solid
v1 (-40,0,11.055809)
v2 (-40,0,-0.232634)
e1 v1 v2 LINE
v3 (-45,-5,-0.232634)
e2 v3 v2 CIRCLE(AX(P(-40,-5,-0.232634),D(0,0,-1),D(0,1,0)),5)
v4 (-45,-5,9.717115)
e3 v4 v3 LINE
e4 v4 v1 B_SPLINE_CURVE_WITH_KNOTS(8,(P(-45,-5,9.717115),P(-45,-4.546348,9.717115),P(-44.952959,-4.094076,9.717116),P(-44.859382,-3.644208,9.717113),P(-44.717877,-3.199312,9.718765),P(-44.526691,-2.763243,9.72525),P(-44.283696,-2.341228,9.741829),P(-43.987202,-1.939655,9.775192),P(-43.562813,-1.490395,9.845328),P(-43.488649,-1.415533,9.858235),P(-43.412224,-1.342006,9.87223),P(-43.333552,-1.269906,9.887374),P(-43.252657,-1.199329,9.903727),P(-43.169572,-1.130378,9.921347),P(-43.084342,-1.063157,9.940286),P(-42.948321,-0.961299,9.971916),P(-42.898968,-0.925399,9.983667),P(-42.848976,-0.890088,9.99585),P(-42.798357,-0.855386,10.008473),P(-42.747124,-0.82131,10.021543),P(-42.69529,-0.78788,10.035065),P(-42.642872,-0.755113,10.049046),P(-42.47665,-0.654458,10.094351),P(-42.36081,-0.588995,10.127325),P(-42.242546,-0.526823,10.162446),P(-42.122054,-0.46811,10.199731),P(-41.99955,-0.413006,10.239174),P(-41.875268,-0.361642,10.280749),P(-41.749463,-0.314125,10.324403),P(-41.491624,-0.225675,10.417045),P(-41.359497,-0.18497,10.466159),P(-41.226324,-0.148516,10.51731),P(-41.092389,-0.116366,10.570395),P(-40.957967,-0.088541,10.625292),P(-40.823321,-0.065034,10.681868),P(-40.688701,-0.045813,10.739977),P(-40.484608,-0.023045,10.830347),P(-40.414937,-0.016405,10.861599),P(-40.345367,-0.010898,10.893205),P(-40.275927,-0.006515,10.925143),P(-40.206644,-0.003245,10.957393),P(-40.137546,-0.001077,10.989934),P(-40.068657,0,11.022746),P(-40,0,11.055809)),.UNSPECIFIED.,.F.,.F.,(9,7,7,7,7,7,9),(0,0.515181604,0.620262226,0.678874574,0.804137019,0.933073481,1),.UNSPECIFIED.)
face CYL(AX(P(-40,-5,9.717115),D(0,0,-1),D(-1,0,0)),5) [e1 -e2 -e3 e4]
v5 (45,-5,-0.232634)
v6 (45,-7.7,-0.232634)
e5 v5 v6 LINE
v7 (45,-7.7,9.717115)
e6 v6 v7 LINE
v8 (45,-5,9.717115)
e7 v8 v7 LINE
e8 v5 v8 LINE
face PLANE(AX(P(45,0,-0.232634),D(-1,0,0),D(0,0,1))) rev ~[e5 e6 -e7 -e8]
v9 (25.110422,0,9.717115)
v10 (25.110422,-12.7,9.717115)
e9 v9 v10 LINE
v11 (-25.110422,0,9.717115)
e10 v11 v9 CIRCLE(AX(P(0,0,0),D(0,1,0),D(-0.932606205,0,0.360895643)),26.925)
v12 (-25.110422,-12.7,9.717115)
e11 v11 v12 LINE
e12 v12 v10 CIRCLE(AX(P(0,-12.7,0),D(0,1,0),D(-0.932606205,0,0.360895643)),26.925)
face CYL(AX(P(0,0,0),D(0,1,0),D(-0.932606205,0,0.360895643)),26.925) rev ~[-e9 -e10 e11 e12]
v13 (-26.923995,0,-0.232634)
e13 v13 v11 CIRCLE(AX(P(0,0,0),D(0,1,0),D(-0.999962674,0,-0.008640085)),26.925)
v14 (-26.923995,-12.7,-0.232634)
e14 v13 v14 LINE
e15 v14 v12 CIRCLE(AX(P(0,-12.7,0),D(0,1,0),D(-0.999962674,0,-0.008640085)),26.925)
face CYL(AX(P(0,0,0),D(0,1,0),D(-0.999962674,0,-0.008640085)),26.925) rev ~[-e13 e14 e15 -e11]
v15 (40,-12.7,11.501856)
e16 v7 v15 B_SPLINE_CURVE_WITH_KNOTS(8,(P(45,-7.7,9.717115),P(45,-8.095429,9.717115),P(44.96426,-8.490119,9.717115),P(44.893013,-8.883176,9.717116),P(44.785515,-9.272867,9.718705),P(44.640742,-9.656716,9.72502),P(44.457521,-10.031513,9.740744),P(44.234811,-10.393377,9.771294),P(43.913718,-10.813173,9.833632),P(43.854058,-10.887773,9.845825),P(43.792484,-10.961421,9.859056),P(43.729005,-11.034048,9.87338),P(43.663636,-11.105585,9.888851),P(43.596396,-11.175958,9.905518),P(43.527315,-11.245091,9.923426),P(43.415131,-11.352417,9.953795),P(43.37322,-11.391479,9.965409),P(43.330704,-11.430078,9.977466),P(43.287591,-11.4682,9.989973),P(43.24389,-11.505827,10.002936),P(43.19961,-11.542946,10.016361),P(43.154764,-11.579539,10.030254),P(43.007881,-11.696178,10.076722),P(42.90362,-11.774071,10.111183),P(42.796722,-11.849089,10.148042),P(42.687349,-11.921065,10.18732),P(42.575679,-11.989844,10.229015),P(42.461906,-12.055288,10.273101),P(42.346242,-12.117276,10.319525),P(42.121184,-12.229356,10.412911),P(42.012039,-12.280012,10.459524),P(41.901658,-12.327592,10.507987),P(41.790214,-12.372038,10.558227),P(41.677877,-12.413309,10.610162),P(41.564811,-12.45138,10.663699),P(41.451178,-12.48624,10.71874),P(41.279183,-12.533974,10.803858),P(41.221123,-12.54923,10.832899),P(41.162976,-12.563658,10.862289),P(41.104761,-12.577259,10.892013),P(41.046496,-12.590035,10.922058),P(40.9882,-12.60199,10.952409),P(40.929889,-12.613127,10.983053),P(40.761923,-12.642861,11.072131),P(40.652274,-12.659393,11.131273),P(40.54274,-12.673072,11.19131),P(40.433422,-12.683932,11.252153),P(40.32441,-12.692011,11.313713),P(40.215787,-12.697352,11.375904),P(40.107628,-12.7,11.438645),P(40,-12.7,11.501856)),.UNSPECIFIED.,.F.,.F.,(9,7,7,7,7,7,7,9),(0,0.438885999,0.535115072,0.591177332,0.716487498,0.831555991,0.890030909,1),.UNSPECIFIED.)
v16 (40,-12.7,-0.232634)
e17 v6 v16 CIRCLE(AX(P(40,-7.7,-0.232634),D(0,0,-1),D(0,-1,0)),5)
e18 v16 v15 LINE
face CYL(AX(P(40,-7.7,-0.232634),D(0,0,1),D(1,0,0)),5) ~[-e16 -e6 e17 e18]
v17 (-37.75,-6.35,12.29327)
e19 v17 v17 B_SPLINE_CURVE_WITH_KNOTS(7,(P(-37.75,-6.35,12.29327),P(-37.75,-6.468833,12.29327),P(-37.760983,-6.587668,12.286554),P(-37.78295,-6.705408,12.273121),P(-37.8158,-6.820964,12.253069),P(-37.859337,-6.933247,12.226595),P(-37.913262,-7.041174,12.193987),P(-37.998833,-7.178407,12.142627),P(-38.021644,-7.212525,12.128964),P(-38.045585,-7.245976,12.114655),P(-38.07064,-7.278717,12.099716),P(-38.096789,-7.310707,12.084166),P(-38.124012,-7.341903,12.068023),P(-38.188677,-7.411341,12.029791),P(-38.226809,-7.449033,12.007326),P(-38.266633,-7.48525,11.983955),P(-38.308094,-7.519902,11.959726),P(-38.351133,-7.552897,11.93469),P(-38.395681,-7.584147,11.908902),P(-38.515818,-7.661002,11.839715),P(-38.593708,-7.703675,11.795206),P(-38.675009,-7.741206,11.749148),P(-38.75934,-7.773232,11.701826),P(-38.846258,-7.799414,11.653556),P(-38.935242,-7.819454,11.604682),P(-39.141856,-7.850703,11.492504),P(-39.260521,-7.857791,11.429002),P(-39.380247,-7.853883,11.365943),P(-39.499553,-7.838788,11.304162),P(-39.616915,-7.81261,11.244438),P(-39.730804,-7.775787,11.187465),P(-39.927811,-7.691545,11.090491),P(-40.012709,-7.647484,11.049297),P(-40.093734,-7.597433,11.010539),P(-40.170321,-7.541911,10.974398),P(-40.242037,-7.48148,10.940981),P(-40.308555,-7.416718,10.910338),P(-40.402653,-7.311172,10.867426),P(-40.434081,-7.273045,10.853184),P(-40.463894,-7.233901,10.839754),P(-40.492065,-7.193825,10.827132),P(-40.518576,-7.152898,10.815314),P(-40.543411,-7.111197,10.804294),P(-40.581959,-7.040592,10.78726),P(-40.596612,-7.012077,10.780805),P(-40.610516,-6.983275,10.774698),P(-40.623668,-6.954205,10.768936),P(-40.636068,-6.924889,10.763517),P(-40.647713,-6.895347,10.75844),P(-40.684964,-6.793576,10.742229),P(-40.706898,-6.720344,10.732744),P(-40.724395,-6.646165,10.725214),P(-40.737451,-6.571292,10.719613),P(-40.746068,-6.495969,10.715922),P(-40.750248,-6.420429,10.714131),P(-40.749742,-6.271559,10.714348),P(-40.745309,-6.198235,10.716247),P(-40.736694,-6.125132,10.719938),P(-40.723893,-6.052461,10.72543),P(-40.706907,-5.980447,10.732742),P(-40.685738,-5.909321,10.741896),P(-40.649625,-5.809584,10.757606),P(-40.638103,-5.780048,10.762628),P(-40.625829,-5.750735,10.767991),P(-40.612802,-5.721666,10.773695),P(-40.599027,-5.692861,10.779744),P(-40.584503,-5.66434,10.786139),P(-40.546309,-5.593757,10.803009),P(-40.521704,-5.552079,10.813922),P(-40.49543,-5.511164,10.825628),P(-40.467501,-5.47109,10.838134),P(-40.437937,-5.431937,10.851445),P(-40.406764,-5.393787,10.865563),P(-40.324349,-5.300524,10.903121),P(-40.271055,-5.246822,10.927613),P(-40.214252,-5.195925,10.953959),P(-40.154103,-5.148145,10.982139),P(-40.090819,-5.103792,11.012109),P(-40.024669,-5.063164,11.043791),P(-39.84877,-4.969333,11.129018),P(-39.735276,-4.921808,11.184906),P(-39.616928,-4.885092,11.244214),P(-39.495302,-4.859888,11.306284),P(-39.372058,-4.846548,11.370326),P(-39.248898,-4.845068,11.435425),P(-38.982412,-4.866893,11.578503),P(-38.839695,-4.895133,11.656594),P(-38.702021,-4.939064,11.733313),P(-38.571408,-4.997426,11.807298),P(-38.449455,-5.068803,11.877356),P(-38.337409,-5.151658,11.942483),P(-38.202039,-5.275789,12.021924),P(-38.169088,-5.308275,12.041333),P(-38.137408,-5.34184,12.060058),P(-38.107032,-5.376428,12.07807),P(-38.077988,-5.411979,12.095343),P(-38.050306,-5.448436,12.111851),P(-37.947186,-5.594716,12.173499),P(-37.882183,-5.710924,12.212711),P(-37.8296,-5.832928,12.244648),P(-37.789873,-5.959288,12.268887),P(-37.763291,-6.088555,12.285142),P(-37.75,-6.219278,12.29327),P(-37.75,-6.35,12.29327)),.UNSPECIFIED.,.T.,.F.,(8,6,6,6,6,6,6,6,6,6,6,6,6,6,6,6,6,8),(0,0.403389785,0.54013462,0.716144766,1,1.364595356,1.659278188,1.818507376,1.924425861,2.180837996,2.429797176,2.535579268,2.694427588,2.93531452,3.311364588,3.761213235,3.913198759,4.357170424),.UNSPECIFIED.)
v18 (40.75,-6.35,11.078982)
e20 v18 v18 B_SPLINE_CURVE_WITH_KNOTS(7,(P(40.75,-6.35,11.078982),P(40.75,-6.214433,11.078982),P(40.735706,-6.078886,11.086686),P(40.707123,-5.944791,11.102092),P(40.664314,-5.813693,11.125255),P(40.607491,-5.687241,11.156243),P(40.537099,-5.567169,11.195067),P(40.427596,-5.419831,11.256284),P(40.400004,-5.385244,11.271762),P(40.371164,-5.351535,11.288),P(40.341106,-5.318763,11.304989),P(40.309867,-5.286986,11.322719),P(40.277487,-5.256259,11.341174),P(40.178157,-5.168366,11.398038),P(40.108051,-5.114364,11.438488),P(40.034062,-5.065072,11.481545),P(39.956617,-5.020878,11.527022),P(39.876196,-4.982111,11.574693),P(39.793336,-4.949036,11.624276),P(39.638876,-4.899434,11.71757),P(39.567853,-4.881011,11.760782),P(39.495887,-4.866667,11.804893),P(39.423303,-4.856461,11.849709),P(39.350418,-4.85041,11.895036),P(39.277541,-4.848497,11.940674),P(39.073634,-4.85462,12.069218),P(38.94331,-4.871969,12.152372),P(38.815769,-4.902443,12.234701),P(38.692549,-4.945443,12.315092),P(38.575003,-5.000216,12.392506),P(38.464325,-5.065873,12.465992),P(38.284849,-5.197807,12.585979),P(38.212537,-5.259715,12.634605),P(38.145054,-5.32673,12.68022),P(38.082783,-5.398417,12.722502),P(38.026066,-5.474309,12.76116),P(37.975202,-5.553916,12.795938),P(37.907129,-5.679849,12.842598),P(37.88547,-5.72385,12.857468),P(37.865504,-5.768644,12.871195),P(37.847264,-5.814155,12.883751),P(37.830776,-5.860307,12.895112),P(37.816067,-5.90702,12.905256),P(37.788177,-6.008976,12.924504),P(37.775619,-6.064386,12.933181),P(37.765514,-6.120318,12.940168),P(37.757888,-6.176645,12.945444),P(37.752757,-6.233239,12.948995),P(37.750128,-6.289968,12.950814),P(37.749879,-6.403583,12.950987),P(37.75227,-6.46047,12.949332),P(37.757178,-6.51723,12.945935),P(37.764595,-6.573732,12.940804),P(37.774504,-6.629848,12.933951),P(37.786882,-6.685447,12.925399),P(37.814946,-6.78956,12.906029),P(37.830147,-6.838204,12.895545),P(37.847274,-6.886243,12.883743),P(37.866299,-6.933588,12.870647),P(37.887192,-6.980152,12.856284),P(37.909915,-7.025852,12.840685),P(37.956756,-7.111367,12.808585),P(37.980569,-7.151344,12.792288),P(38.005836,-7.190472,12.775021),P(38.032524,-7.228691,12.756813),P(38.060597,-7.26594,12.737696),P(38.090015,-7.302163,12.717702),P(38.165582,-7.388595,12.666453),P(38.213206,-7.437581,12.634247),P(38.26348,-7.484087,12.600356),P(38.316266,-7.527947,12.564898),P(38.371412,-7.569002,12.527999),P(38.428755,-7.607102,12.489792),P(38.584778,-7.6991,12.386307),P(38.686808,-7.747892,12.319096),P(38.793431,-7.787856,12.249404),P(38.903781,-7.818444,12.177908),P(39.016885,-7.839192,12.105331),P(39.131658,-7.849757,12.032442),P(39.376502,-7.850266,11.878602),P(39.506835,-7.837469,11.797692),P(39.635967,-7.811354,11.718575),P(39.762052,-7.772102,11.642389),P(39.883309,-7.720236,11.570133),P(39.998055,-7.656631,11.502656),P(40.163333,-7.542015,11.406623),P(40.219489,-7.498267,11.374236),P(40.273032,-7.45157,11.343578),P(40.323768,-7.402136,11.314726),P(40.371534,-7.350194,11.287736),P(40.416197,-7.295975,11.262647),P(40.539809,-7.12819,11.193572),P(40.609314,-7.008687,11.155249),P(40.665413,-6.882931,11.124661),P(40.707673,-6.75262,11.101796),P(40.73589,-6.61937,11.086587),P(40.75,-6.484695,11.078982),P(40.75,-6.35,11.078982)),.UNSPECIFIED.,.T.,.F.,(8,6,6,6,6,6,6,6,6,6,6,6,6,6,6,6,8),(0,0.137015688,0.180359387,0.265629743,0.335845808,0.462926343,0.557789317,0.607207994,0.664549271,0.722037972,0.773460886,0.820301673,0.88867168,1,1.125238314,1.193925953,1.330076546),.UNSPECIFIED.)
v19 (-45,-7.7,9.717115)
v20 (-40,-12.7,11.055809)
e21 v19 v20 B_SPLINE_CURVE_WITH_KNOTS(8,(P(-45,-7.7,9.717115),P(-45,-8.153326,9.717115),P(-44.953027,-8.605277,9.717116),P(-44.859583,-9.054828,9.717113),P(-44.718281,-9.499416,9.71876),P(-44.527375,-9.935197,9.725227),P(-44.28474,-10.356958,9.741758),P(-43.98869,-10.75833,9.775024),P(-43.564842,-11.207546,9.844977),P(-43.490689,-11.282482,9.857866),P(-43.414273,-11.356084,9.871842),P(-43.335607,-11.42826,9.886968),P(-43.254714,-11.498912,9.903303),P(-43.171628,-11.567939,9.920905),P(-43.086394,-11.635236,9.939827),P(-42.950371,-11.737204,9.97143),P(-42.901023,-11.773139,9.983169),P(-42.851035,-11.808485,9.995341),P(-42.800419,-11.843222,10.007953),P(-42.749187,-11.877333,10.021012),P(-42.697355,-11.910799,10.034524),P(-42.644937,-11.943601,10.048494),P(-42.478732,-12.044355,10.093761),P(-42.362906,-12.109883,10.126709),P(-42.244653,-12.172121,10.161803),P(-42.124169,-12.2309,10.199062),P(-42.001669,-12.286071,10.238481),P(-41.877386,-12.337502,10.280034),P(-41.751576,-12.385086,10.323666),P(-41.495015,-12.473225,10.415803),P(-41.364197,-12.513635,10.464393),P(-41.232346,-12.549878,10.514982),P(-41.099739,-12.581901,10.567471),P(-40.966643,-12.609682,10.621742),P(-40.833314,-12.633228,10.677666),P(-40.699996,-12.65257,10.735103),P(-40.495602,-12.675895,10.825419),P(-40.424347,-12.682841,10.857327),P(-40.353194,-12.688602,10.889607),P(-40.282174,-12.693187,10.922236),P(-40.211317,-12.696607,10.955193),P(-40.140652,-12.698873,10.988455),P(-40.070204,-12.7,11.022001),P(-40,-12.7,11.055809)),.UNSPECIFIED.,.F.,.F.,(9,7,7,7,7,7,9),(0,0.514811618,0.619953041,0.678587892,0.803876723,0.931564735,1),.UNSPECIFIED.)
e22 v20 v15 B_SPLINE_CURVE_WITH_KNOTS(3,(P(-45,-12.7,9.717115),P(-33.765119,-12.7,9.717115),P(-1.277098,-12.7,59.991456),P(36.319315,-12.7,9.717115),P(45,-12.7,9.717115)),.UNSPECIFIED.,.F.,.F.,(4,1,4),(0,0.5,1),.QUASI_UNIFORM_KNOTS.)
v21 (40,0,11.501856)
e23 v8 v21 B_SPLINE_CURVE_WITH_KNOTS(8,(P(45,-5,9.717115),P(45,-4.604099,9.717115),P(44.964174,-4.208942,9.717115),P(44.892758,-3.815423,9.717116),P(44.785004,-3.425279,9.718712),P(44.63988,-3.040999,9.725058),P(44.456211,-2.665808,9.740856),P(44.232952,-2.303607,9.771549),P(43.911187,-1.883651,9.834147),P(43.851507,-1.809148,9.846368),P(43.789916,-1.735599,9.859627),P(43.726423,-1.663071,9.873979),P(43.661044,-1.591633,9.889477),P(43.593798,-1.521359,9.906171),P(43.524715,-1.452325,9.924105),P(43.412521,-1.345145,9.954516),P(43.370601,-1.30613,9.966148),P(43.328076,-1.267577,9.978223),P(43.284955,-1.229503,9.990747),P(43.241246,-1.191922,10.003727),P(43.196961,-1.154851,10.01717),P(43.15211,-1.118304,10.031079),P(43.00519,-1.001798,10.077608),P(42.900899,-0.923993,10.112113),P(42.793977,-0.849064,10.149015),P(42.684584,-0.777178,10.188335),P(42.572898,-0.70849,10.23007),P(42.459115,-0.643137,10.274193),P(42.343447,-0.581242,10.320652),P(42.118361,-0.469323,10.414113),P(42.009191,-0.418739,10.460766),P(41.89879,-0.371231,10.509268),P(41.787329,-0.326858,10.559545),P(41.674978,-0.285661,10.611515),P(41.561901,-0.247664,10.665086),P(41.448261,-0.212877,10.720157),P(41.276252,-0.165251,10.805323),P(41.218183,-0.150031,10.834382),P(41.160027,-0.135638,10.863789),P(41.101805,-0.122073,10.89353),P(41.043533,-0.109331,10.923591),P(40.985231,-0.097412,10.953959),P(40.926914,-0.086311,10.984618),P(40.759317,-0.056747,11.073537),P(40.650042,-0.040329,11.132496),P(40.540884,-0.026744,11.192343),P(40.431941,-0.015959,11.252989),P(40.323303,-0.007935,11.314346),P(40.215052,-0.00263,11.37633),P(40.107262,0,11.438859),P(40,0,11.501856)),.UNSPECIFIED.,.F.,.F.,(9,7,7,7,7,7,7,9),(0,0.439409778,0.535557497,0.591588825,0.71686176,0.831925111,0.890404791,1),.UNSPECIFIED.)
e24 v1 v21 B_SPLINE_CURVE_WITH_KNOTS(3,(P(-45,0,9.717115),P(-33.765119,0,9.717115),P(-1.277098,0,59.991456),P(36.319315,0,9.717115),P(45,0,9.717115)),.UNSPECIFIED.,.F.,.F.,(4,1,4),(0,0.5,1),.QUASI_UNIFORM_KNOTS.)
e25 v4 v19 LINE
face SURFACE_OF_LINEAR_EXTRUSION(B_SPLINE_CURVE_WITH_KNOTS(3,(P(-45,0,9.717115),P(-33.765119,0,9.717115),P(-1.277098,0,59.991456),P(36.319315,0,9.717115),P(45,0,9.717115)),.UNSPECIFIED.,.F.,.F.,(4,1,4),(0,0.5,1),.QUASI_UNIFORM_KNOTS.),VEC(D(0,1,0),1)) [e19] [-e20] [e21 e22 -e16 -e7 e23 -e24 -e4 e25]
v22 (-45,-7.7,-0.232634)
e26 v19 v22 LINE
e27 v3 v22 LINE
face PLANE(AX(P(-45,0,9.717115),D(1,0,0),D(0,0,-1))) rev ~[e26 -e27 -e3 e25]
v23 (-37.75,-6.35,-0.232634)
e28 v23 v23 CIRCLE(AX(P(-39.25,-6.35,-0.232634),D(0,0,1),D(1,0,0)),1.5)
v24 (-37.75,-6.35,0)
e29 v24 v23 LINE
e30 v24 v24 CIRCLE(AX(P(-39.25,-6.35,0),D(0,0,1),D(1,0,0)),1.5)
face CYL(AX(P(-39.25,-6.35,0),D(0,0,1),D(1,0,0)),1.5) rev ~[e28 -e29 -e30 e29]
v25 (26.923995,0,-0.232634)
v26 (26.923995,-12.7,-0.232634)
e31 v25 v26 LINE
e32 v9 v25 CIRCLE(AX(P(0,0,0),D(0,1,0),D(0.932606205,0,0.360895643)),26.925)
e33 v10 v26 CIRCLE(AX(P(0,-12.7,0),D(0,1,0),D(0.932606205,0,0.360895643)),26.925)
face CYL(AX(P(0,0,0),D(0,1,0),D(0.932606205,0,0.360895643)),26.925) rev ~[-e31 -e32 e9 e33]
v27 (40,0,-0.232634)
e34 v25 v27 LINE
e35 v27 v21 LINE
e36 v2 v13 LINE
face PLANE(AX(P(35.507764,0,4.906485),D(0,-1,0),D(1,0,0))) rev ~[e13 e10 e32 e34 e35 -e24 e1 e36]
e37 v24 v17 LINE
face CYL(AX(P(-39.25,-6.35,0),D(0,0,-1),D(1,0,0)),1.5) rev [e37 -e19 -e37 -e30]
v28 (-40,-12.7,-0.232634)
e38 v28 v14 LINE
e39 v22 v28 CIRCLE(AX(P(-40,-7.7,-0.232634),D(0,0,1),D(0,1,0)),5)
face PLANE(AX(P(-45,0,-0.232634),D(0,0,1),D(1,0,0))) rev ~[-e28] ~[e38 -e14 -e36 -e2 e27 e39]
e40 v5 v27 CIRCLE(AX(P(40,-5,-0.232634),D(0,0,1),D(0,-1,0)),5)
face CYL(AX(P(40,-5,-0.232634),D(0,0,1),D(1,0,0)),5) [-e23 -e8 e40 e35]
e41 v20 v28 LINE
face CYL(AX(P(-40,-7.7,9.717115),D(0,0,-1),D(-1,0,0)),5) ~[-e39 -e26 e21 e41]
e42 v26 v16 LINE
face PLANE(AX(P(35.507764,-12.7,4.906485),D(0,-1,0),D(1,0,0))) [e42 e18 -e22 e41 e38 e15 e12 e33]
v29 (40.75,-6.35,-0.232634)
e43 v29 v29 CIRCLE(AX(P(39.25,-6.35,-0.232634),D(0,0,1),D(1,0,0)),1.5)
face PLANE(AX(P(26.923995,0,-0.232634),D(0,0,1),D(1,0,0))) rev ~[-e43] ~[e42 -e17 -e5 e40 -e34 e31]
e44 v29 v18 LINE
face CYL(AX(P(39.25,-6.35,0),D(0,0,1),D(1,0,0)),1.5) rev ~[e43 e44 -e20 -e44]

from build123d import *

# Parameters (mm, degrees)
F1_DEPTH = 12.7
F2_R     = 5
F3_R     = 1.5
F4_DEPTH = 15.1


# Not quite as in the source:
# - a feature names something its author has since deleted; it is built from what else it names


with BuildPart() as f1:
    # F0 (on Front) → F1 (new body)
    with BuildSketch(Plane.XZ):
        with BuildLine():
            Line((26.9239949913, -0.2326342749), (45, -0.2326342749))
            Line((45, -0.2326342749), (45, 9.7171152011))
            Line((45, 9.7171152011), (25.1104220827, 9.7171152011))
            ThreePointArc((25.1104220827, 9.7171152011), (26.4885733613, 4.828157649), (26.9239949913, -0.2326342749))
        make_face()
        with BuildLine():
            Line((25.1104220827, 9.7171152011), (45, 9.7171152011))
            add(Edge.make_bspline(
                [(-45, 9.7171152011), (-33.7651185691, 9.7171152011), (-1.2770984322, 59.9914556369), (36.3193154335, 9.7171152011), (45, 9.7171152011)],
                knots=[0, 0, 0, 0, 0.5, 1, 1, 1, 1], degree=3))
            Line((-45, 9.7171152011), (-25.1104220827, 9.7171152011))
            ThreePointArc((-25.1104220827, 9.7171152011), (0, 26.925), (25.1104220827, 9.7171152011))
        make_face()
        with BuildLine():
            Line((-25.1104220827, 9.7171152011), (-45, 9.7171152011))
            Line((-45, 9.7171152011), (-45, -0.2326342749))
            Line((-45, -0.2326342749), (-26.9239949913, -0.2326342749))
            ThreePointArc((-26.9239949913, -0.2326342749), (-26.4885733613, 4.828157649), (-25.1104220827, 9.7171152011))
        make_face()
    extrude(amount=F1_DEPTH)

    # F2
    f2_edges = [f1.edges().sort_by_distance(p)[0] for p in [
        (-45, -12.7, 4.74224),
        (-45, 0, 4.74224),
        (45, -12.7, 4.74224),
        (45, 0, 4.74224),
    ]]
    fillet(f2_edges, radius=F2_R)

    # F3 (on Top) → F4 (cut, symmetric)
    with BuildSketch(Plane.XY):
        with Locations((-39.25, -6.35)):
            Circle(F3_R)
        with Locations((39.25, -6.35)):
            Circle(F3_R)
    extrude(amount=F4_DEPTH, both=True, mode=Mode.SUBTRACT)


solid = f1.part
